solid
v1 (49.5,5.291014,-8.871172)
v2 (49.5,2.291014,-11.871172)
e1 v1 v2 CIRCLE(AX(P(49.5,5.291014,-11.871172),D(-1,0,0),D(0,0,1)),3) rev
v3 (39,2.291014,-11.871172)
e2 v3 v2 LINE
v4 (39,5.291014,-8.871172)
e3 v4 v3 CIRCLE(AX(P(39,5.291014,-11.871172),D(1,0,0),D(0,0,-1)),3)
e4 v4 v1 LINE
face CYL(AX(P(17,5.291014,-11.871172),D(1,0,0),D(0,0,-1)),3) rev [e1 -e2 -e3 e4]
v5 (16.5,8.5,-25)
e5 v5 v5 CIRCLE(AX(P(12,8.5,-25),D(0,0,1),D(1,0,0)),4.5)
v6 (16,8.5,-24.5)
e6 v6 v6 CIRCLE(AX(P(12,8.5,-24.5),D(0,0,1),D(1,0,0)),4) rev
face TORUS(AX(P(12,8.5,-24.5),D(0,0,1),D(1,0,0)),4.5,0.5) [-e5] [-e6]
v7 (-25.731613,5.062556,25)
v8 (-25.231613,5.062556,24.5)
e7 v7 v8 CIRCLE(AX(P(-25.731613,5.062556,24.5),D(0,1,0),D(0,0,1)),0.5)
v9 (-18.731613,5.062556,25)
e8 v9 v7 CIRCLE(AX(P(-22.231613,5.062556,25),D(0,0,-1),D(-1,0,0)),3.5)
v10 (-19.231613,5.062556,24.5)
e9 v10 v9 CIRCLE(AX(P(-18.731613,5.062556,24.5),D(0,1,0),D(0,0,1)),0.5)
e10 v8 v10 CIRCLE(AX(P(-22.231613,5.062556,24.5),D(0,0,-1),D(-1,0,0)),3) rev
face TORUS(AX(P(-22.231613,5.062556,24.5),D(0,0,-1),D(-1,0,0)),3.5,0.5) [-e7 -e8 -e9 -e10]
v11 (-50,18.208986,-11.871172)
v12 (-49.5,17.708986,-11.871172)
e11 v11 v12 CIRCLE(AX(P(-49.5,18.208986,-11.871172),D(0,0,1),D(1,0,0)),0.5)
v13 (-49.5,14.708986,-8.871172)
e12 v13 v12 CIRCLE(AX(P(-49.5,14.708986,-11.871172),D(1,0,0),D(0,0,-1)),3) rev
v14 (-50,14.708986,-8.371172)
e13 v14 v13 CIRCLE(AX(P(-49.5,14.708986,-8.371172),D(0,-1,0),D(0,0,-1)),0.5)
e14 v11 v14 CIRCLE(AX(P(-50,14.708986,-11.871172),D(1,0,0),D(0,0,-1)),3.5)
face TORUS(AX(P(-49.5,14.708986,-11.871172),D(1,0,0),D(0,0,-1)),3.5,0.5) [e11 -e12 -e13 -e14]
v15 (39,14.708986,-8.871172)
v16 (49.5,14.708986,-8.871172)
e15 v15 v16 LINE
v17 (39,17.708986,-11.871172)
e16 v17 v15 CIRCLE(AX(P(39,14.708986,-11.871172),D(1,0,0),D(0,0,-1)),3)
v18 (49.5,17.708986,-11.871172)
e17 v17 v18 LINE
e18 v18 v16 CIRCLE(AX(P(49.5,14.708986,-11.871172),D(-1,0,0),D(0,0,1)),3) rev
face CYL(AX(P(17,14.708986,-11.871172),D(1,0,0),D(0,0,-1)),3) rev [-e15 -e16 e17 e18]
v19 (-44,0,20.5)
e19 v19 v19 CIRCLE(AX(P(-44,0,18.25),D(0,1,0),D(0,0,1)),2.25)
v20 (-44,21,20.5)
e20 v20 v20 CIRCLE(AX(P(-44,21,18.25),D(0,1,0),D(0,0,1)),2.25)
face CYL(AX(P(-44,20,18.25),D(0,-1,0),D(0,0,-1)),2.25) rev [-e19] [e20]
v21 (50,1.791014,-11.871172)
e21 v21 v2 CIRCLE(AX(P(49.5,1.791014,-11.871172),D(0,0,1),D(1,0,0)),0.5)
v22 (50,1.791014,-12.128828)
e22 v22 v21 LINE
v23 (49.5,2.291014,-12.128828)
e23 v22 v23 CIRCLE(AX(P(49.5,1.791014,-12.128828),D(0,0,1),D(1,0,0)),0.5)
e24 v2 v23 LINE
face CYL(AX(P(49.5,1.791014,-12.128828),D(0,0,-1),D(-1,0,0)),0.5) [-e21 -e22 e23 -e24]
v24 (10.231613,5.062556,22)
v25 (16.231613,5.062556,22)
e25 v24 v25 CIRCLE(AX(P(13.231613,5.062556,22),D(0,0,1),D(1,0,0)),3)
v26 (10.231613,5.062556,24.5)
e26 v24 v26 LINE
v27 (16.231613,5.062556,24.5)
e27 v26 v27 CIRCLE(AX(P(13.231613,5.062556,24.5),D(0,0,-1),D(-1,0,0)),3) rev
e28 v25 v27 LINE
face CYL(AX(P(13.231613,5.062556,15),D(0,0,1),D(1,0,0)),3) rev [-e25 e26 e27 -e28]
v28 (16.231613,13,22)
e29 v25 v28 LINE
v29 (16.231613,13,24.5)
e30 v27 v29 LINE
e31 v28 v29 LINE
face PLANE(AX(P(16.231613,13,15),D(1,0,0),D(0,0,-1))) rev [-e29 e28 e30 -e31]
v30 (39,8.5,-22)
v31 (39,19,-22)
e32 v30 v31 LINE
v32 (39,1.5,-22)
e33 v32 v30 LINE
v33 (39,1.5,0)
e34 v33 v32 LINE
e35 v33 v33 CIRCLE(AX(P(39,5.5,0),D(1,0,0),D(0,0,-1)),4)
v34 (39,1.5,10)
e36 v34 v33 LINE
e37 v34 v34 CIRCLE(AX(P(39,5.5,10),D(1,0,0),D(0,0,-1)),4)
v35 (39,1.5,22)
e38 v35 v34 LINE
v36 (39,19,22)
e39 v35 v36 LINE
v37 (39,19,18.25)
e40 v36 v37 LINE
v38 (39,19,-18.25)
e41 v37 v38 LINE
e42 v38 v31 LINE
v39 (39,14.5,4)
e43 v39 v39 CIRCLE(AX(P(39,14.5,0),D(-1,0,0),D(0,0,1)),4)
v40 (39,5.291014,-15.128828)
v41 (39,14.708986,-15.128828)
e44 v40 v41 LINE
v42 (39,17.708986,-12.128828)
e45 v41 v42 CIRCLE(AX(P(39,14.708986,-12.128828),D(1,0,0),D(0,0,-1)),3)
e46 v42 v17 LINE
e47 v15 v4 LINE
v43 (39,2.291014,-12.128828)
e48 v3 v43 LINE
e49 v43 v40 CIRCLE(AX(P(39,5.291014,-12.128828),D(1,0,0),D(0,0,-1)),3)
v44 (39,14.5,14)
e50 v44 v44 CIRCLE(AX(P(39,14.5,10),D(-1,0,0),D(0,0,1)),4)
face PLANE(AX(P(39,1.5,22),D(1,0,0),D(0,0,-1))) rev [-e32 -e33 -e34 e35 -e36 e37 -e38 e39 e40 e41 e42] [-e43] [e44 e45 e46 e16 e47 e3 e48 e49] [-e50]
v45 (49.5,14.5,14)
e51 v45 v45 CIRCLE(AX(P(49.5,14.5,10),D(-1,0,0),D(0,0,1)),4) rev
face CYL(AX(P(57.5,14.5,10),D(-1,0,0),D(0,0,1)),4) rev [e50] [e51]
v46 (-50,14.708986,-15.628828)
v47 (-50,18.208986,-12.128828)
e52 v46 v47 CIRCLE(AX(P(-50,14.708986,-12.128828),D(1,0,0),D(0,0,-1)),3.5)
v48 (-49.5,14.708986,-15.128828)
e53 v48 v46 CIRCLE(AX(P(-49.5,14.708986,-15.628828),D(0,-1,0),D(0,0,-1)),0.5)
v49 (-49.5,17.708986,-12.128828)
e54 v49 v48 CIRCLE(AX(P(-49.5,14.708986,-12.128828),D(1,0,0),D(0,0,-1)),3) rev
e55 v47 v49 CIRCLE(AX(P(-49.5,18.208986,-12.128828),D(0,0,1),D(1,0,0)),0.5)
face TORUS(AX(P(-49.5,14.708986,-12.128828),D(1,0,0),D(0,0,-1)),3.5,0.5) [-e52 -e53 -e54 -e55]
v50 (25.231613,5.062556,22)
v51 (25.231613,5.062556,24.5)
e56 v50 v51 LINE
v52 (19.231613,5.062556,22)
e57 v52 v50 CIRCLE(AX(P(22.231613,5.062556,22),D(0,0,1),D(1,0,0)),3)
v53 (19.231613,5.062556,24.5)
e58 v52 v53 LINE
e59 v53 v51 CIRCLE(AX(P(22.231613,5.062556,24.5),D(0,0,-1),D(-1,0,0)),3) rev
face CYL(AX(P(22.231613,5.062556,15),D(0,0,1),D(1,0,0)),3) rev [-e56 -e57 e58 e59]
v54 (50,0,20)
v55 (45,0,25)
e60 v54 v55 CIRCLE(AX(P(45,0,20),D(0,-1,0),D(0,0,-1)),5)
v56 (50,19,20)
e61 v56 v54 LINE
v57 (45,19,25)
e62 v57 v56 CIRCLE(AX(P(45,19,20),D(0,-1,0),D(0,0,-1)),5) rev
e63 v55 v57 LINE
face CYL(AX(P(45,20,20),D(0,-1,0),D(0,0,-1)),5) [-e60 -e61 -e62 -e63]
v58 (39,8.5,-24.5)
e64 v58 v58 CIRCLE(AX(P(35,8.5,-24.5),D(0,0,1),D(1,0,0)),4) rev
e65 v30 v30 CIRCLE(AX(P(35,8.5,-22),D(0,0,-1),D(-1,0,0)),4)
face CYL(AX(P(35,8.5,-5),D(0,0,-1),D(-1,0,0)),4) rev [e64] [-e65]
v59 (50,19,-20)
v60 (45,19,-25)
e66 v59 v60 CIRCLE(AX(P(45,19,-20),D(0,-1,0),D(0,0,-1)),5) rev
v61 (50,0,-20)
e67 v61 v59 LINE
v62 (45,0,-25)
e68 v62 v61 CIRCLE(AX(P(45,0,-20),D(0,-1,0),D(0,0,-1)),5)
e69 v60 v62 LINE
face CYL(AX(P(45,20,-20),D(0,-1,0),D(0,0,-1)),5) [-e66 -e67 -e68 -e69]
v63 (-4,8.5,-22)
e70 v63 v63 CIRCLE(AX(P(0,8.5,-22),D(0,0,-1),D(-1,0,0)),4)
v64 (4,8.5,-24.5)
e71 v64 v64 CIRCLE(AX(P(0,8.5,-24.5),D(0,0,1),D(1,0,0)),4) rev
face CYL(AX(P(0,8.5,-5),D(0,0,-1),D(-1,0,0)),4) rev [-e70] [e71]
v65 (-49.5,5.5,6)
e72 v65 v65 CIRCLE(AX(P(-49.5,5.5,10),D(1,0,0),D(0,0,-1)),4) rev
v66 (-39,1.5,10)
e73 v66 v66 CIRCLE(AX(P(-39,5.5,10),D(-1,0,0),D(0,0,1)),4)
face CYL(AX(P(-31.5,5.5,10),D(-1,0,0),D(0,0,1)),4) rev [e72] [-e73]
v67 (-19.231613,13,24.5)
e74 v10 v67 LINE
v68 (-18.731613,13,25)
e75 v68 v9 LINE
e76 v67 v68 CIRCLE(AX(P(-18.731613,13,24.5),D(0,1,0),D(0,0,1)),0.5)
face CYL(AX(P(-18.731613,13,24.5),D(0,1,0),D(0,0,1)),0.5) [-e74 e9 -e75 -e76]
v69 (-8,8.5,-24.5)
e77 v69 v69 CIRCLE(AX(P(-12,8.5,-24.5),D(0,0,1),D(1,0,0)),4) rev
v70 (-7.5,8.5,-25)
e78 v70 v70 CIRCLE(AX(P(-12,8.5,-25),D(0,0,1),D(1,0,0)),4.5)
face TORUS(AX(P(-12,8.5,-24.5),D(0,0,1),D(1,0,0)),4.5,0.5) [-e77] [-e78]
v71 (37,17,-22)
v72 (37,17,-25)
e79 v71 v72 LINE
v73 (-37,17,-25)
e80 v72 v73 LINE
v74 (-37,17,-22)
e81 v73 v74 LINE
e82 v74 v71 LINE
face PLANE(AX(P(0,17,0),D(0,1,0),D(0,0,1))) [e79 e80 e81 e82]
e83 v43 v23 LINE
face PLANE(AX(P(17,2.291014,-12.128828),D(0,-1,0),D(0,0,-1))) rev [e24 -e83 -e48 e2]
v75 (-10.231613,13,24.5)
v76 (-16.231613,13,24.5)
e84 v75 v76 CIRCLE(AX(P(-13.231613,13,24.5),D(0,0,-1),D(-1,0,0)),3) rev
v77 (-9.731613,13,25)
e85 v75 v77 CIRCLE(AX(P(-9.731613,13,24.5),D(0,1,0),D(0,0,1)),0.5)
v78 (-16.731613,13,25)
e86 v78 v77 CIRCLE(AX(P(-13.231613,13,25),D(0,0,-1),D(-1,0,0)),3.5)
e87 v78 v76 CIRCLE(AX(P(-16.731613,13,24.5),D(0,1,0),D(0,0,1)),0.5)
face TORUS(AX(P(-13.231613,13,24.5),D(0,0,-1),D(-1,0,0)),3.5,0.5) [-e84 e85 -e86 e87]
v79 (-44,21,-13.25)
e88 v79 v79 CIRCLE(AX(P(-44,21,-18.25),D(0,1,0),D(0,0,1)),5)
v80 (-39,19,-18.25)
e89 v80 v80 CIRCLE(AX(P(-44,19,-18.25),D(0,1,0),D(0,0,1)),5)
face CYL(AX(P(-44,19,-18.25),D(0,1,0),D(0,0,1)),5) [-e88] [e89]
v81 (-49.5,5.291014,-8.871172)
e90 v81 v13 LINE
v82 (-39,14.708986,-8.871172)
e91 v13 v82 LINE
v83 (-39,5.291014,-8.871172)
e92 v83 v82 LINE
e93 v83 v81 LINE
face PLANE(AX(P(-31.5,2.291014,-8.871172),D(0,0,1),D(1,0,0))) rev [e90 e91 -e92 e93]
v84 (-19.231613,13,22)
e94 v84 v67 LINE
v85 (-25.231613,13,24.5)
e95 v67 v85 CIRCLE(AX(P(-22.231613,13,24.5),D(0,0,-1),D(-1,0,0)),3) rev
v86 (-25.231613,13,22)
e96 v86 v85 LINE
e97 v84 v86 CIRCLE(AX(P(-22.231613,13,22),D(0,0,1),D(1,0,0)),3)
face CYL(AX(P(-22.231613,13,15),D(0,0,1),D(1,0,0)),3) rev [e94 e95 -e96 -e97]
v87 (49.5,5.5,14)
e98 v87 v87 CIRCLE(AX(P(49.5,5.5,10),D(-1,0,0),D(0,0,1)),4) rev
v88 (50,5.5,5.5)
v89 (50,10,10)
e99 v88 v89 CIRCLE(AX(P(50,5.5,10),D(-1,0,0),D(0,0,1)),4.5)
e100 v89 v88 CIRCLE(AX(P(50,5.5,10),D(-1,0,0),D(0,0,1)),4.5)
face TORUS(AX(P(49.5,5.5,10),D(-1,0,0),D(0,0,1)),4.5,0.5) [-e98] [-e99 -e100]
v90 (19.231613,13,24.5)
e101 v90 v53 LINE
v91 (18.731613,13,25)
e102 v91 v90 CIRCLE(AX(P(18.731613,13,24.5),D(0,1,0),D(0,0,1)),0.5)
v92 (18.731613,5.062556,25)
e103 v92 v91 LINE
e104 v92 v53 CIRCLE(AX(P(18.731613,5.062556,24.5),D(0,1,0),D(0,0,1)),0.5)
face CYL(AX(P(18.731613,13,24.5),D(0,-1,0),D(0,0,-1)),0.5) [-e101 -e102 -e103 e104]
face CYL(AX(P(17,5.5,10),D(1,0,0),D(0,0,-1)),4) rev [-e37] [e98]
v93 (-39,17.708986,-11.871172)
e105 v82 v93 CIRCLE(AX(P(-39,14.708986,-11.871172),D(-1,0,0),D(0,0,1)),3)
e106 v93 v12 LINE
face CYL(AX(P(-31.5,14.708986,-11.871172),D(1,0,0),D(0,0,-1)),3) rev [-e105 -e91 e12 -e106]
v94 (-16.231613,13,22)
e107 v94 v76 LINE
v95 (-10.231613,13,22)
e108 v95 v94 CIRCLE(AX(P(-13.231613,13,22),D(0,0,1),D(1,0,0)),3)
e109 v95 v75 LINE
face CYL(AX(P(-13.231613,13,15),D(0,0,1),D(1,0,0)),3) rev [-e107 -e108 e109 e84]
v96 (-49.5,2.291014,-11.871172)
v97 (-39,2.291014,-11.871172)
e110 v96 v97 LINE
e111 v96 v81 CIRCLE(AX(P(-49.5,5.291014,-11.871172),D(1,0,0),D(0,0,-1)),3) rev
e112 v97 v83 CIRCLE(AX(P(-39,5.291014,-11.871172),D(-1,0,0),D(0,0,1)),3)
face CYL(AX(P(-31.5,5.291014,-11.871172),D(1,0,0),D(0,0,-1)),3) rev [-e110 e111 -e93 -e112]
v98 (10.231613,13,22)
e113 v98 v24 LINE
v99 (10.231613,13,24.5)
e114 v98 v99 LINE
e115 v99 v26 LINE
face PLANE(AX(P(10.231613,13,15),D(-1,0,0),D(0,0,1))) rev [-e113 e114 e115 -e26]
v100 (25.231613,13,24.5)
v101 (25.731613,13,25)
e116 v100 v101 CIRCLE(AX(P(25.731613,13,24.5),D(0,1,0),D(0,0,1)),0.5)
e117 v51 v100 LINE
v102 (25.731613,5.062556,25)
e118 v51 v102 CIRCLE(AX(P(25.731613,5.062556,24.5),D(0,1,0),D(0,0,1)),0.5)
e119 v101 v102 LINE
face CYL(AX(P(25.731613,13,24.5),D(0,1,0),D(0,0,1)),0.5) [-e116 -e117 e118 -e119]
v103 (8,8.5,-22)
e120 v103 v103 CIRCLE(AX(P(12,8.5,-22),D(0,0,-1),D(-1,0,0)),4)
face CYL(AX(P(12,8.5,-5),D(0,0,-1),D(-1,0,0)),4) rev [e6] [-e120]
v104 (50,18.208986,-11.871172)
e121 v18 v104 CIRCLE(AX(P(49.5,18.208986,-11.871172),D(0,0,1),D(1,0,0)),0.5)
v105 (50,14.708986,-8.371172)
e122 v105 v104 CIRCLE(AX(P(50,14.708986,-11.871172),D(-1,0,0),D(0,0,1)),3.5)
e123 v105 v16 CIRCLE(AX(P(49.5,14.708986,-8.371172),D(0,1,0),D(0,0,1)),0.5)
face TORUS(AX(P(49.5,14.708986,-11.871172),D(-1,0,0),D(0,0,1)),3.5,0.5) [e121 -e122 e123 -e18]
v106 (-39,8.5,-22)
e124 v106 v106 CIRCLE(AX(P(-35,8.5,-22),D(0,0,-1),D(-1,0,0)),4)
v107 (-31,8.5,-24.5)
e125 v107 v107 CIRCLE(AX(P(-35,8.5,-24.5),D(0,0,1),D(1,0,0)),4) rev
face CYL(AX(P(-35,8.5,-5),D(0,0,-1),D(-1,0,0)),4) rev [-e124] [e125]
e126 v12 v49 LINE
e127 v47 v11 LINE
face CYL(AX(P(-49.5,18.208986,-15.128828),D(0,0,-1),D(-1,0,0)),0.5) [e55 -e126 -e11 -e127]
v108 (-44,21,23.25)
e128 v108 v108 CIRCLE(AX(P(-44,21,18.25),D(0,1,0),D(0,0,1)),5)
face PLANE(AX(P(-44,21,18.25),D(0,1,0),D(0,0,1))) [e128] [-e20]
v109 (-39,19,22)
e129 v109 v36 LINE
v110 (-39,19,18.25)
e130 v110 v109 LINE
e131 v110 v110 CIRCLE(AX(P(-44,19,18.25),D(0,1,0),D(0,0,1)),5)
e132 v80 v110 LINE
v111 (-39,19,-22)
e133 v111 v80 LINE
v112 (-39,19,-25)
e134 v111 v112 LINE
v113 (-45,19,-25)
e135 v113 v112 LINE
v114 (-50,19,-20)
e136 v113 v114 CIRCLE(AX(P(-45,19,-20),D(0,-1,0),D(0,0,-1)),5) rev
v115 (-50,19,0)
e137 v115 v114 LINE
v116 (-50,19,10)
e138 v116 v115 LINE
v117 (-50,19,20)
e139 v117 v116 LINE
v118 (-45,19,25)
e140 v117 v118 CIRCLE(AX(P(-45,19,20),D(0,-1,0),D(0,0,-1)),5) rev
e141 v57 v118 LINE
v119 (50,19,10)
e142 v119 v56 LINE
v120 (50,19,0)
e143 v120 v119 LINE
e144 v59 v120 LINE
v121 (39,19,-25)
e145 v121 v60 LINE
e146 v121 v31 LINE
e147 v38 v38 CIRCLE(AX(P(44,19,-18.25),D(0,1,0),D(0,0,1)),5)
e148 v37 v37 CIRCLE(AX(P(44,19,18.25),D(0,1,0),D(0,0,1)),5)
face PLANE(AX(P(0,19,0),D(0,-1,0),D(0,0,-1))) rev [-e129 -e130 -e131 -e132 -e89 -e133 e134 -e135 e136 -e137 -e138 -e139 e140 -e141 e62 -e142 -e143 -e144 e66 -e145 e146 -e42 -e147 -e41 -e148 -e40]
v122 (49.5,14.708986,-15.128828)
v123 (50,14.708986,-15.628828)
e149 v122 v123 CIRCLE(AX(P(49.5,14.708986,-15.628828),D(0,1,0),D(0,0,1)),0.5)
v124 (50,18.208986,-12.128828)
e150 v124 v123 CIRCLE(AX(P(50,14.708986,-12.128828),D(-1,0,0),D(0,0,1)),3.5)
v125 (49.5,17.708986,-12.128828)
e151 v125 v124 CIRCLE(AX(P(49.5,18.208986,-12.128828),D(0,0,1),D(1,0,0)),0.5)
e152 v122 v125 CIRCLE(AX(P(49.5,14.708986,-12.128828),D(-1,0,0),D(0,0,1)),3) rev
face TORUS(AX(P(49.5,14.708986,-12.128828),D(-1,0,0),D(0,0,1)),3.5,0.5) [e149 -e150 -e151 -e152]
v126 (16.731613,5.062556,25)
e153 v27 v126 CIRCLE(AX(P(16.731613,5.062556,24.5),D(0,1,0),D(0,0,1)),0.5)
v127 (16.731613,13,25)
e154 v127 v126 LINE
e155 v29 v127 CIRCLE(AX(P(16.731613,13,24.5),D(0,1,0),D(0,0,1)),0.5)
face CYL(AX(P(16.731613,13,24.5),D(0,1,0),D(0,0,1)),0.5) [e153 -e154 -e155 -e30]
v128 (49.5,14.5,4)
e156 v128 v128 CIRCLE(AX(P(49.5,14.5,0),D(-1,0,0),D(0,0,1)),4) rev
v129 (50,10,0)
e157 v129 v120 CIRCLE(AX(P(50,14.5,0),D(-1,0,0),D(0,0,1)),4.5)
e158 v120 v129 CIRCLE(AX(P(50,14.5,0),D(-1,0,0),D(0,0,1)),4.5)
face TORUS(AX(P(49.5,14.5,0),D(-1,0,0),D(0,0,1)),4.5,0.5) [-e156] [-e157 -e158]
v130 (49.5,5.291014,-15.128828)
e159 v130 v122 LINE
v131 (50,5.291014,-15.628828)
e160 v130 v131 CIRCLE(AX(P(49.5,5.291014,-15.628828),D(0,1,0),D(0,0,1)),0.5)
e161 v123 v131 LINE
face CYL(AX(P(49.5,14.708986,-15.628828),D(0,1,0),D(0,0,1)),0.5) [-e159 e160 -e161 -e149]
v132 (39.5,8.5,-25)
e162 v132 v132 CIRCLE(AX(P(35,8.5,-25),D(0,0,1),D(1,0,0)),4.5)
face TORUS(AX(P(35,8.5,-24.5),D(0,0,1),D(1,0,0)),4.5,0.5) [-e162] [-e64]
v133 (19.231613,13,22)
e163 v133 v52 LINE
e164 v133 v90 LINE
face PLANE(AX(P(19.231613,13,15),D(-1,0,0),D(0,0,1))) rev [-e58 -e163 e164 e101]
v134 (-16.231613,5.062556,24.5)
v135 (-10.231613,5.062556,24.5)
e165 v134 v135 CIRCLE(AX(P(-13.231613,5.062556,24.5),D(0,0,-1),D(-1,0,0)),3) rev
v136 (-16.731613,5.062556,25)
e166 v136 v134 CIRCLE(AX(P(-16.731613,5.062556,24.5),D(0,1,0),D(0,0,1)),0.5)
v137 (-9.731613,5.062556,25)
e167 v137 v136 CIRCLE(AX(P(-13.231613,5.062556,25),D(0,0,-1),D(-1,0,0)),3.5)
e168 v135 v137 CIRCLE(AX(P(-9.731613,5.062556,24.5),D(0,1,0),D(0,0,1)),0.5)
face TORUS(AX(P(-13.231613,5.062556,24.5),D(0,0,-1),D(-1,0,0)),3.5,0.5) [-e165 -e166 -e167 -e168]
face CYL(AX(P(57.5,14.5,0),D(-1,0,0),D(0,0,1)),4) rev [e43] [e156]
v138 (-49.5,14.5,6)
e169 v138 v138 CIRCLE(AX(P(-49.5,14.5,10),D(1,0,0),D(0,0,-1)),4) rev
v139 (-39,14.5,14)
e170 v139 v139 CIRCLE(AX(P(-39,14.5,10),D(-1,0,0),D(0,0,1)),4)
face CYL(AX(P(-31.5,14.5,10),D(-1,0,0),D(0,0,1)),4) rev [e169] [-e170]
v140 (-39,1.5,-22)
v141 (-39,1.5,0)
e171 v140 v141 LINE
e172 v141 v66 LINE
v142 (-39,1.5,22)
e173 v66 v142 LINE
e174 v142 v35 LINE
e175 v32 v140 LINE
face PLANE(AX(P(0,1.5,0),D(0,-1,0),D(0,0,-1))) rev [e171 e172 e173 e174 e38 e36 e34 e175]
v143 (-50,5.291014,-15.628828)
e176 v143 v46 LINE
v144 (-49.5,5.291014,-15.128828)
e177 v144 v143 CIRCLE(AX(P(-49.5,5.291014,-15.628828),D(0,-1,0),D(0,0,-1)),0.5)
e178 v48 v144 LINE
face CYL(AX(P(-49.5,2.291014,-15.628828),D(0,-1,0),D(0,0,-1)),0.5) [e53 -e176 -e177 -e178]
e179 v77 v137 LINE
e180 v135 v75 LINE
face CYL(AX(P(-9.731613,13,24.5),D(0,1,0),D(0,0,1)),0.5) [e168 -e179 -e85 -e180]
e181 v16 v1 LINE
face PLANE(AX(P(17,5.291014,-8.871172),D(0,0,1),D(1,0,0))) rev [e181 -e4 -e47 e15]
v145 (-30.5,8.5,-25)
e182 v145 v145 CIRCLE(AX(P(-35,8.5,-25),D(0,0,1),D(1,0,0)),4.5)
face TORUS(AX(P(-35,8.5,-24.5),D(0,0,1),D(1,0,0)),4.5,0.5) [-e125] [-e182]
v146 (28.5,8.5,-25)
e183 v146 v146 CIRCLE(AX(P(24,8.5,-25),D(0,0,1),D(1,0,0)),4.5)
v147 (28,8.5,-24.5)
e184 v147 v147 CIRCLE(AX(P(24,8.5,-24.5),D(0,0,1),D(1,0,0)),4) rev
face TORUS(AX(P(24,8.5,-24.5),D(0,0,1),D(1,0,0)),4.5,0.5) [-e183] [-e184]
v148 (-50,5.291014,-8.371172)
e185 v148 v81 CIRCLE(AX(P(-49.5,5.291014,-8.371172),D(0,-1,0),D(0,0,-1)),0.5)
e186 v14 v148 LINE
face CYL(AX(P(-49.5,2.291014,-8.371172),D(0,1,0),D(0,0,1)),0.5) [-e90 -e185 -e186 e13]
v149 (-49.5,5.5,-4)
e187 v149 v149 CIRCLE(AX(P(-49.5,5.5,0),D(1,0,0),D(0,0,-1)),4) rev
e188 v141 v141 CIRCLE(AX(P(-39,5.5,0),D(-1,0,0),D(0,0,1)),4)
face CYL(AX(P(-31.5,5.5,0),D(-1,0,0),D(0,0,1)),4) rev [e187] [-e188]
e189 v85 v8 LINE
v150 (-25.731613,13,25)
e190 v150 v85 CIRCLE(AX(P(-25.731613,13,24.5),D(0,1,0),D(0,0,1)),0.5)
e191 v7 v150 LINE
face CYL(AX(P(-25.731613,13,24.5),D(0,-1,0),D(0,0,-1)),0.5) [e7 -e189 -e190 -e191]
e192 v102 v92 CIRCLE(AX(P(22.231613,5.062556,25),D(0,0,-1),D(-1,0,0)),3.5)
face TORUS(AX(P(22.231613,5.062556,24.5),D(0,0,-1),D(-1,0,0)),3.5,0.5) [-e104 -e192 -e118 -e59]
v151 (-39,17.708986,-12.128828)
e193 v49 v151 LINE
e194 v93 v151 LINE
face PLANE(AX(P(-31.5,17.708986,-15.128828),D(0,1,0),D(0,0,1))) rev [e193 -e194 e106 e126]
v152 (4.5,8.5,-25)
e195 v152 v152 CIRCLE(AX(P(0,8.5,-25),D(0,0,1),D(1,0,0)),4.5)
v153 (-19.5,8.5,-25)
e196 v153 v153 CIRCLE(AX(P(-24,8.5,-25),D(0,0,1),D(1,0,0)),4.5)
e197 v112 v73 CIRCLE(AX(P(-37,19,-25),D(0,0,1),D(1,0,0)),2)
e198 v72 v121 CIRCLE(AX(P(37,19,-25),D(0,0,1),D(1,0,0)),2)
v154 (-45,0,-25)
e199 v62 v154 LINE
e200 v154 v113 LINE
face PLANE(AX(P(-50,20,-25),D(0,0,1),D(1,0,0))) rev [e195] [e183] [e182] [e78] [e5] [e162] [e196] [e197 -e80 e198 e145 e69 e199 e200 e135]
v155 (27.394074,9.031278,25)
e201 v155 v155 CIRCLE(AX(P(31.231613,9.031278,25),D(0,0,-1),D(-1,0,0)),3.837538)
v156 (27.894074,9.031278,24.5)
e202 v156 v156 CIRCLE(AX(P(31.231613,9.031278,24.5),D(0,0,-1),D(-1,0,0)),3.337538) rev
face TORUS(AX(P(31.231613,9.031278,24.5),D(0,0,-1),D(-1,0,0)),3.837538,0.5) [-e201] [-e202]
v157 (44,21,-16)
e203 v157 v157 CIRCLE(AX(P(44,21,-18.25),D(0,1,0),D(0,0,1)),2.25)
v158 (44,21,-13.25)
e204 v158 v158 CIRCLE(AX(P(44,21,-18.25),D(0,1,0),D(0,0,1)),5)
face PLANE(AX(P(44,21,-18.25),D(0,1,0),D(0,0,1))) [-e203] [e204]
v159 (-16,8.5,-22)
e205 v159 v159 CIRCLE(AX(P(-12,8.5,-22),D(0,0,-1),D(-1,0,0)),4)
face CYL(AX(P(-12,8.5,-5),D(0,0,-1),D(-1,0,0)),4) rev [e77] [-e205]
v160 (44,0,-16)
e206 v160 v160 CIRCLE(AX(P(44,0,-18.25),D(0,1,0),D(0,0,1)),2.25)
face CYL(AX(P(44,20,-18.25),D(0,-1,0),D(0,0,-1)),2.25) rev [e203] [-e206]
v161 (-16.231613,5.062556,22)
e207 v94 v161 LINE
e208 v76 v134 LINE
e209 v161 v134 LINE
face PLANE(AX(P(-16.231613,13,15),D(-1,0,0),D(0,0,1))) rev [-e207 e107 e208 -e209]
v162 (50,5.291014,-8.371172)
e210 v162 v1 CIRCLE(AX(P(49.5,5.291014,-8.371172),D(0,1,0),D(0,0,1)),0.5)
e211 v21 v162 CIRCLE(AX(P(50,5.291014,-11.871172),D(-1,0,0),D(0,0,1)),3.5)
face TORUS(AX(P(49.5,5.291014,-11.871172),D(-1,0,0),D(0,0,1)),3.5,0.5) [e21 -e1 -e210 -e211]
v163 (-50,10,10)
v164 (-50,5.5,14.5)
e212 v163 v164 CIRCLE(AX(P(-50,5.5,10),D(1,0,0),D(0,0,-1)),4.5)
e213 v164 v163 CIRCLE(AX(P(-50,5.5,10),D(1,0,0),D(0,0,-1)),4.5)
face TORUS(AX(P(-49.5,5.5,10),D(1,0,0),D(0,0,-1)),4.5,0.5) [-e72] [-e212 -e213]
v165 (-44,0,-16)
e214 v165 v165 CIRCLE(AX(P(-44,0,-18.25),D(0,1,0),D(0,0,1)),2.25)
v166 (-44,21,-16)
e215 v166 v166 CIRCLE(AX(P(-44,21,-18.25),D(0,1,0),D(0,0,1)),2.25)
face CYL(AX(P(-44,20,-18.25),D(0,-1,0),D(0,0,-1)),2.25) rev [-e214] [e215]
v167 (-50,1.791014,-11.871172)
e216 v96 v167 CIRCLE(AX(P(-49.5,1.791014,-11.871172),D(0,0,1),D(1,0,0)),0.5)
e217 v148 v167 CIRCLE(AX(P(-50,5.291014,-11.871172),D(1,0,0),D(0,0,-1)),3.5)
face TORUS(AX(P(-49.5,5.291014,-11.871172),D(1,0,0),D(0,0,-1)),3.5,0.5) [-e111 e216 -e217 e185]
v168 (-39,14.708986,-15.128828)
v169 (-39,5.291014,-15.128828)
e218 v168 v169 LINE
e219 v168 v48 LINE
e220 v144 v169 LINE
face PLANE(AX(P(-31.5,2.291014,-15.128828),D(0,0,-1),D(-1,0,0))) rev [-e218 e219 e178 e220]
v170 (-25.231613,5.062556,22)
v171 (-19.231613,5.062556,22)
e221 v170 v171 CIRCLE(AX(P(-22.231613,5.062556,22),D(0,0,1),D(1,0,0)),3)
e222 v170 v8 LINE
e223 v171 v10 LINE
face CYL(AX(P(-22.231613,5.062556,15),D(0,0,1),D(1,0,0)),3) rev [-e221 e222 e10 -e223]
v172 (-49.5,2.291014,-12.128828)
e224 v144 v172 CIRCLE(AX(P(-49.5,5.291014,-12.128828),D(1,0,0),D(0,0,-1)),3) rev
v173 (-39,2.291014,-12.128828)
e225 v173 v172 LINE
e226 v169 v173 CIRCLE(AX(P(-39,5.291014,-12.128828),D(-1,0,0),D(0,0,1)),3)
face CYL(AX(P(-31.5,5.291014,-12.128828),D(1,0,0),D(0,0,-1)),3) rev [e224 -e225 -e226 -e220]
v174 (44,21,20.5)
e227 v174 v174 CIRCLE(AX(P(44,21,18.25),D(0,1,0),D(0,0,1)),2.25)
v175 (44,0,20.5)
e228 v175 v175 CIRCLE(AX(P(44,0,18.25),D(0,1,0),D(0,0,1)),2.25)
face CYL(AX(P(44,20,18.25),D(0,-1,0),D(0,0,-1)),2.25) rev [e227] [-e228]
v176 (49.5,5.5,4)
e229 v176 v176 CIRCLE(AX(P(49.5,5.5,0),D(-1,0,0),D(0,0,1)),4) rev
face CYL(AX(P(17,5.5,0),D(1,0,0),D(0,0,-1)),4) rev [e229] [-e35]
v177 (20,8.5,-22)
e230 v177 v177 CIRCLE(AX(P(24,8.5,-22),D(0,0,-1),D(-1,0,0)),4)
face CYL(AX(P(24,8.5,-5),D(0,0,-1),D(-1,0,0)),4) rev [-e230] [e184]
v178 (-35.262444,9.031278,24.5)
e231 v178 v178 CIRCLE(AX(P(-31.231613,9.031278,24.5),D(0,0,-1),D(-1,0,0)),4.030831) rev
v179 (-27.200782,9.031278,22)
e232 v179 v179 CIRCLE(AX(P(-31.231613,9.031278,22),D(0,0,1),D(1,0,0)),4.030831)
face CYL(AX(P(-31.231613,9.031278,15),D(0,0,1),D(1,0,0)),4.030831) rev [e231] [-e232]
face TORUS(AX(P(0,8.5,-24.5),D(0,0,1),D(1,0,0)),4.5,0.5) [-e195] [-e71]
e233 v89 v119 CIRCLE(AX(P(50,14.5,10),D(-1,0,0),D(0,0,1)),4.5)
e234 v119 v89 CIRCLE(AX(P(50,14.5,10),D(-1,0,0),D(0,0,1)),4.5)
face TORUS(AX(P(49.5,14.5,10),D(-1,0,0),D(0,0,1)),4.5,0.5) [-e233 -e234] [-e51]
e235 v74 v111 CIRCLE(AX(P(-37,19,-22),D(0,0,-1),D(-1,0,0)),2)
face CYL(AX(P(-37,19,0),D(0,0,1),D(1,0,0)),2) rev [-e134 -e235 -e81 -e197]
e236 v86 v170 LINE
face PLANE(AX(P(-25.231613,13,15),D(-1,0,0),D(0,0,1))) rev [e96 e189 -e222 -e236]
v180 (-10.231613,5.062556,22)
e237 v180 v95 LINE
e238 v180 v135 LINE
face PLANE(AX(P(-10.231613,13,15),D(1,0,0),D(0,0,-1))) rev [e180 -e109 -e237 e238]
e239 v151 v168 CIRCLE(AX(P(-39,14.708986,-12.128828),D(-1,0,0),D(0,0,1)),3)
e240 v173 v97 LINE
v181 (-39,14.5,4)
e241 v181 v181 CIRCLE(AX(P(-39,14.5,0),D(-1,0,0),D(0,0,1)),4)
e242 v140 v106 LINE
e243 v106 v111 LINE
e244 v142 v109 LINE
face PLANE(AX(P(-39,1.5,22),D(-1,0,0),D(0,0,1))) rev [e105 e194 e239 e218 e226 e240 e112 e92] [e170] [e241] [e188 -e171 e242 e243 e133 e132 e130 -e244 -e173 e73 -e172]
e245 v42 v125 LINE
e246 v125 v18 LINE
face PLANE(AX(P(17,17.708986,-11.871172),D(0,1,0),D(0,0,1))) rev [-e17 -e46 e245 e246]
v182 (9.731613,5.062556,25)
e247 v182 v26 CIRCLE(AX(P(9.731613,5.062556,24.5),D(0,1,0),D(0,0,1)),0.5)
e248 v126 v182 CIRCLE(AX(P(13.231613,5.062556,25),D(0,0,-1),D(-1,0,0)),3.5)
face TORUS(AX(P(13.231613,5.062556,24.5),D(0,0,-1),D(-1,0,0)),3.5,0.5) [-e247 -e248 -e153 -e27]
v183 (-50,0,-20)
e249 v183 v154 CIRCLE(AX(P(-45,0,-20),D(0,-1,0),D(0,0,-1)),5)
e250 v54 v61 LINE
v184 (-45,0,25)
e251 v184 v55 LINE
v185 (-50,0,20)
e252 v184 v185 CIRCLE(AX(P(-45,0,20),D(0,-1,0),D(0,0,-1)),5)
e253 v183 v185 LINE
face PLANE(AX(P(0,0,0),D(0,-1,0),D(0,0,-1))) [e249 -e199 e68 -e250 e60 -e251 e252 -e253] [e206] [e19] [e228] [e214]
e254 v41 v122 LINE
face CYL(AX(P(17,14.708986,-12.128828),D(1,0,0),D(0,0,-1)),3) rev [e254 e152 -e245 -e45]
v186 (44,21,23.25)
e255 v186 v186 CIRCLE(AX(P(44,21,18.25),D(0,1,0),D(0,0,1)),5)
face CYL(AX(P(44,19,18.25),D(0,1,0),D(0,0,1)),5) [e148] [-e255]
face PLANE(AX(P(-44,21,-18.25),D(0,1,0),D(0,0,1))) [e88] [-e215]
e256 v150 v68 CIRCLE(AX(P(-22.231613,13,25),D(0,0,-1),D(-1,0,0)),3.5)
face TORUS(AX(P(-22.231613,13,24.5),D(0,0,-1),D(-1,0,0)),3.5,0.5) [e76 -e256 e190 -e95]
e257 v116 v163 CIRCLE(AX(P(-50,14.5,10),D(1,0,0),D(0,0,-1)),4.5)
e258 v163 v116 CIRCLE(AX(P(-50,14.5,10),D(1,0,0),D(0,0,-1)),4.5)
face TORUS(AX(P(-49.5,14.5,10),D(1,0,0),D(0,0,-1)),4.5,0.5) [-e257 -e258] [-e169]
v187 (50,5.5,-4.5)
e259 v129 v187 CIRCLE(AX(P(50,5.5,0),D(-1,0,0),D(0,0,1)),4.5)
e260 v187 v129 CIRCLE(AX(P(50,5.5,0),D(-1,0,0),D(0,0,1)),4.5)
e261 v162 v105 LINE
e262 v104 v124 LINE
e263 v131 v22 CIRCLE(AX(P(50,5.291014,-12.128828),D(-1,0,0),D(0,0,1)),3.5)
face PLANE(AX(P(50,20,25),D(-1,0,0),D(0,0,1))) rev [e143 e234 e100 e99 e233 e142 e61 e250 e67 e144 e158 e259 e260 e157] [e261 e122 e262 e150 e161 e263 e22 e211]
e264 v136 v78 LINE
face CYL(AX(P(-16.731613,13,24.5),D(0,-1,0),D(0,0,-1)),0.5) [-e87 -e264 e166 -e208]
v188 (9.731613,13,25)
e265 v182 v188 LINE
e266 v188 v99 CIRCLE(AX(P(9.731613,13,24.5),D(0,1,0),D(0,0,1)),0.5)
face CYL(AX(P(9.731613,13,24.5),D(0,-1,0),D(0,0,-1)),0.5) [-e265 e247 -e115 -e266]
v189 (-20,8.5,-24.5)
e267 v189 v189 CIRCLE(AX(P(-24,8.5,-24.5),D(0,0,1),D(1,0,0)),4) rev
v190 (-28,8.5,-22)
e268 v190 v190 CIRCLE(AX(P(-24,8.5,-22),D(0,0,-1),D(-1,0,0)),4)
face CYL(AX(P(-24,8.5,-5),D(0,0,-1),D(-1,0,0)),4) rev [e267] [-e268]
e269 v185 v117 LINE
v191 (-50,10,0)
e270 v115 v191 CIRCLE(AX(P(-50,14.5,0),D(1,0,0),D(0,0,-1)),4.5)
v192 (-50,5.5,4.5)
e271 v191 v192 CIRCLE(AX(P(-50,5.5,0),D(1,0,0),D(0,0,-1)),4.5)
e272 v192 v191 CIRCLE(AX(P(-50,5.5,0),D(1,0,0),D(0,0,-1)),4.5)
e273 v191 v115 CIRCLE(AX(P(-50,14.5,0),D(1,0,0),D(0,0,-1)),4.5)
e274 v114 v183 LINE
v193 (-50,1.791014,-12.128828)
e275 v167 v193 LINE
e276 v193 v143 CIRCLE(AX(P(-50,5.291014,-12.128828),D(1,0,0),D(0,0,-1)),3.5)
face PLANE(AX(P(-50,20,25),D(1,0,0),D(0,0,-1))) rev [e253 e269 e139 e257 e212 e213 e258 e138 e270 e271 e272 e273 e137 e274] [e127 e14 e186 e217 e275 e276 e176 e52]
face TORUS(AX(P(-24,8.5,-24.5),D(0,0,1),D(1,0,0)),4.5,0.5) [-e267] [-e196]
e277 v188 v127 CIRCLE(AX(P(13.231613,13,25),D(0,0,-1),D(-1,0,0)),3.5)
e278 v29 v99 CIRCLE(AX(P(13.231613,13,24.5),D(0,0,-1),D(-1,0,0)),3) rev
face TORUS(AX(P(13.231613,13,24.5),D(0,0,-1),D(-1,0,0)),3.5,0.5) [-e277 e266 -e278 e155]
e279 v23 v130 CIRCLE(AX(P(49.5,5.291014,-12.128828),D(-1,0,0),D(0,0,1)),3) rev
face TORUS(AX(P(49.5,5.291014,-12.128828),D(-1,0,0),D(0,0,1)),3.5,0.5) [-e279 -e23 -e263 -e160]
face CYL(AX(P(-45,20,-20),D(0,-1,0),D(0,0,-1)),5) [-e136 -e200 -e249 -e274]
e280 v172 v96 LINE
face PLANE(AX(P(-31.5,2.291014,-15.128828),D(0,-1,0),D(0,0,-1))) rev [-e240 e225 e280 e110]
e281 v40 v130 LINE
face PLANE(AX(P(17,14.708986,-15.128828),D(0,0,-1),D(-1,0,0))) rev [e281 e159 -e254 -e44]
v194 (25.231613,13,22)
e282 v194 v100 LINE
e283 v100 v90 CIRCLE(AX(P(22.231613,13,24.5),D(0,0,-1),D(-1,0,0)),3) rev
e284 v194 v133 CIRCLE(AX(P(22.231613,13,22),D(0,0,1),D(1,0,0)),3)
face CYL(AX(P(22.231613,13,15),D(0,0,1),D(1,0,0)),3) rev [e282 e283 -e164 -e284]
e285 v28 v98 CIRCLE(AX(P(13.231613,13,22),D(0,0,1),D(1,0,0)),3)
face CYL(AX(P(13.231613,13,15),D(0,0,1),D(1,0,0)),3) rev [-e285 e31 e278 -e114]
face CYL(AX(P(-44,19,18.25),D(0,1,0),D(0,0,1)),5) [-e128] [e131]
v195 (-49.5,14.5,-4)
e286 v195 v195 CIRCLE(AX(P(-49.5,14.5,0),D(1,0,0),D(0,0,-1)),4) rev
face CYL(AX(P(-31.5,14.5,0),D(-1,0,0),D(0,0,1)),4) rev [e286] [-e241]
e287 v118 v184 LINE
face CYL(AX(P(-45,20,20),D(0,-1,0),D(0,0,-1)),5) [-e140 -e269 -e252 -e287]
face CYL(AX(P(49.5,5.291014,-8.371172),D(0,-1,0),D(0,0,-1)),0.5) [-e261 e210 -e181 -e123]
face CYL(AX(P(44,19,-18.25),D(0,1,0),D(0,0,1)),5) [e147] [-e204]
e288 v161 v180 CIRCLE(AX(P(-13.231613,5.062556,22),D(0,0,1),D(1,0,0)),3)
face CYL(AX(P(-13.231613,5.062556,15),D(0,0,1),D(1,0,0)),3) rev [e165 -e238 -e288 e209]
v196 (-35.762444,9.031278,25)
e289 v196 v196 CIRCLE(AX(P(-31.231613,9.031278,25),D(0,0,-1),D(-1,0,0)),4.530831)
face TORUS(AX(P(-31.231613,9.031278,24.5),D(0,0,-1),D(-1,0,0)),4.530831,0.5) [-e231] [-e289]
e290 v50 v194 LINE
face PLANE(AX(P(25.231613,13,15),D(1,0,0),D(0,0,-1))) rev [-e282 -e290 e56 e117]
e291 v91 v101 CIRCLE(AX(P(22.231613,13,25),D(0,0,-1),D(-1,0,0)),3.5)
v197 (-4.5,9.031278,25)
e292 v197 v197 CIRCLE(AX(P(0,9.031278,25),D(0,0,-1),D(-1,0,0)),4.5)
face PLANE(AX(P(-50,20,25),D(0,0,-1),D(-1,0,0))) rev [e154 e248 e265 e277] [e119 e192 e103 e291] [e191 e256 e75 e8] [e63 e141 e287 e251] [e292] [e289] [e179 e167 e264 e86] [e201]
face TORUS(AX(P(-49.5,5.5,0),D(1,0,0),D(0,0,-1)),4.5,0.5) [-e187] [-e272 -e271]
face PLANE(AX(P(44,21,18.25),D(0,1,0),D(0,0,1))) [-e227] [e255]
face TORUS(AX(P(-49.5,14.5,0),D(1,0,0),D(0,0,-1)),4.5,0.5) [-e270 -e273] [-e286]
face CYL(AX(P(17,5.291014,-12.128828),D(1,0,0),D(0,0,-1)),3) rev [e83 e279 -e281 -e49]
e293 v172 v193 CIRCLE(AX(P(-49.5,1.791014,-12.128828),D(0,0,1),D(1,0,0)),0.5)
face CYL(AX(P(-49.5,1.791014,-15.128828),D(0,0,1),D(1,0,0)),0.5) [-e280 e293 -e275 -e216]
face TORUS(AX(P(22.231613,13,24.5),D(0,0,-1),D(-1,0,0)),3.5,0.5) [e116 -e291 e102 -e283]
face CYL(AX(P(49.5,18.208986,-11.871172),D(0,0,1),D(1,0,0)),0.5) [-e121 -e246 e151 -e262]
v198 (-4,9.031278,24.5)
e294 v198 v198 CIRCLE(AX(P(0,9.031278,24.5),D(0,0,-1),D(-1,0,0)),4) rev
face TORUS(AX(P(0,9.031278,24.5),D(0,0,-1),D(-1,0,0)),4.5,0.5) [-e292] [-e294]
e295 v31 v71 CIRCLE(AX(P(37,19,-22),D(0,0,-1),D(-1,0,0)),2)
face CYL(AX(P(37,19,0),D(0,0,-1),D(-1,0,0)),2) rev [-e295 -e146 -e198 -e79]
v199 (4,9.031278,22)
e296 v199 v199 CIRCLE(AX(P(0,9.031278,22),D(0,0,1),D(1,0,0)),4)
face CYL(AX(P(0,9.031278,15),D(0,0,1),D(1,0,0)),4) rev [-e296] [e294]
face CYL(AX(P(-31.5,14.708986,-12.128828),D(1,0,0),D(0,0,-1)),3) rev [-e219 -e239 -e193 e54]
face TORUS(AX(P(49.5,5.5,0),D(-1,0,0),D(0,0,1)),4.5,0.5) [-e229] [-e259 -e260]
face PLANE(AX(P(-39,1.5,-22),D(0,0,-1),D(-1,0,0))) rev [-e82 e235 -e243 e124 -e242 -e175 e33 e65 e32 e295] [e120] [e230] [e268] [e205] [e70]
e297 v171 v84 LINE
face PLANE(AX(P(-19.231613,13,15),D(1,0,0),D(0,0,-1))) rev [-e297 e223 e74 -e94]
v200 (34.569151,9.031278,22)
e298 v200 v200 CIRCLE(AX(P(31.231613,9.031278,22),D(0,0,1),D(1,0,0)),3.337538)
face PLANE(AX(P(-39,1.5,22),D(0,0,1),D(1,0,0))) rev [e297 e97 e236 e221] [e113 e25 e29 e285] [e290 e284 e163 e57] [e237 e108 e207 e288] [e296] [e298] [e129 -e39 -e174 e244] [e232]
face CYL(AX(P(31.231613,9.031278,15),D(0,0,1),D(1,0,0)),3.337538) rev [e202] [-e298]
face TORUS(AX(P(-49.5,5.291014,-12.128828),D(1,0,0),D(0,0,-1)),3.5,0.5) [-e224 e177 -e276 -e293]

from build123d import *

# Parameters (mm, degrees)
CROQUIS1_W              = 100
CROQUIS1_H              = 50
CROQUIS1_R              = 2.25
SALIENTE_EXTRUIR2_DEPTH = 20
CROQUIS3_W              = 78
CROQUIS3_H              = 44
CORTAR_EXTRUIR1_DEPTH   = 18.5
CROQUIS4_R              = 4
CROQUIS4_W              = 6.257655616
CROQUIS4_H              = 15.417971864
CORTAR_EXTRUIR2_DEPTH   = 18.5
CROQUIS5_R              = 4
CORTAR_EXTRUIR3_DEPTH   = 18.5
REDONDEO1_R             = 5
CROQUIS8_W              = 78
CROQUIS8_H              = 3
CORTAR_EXTRUIR4_DEPTH   = 3
REDONDEO2_R             = 2
CROQUIS9_W              = 114.475750888
CROQUIS9_H              = 62.589988472
CROQUIS9_R              = 5
CORTAR_EXTRUIR6_DEPTH   = 1
REDONDEO3_R             = 3
CROQUIS12_R             = 5
CROQUIS12_R_2           = 2.25
SALIENTE_EXTRUIR4_DEPTH = 1
CROQUIS13_R             = 4
CROQUIS13_R_2           = 3.337538413
CROQUIS13_R_3           = 4.030830943
CORTAR_EXTRUIR8_DEPTH   = 10
CROQUIS14_R             = 4
CORTAR_EXTRUIR9_DEPTH   = 33
CROQUIS16_R             = 4
CORTAR_EXTRUIR10_DEPTH  = 20
REDONDEO6_R             = 0.5


with BuildPart() as part:
    # Croquis1 → Saliente-Extruir2 (new body)
    with BuildSketch(Plane(origin=(0, 0, 0), x_dir=(1, 0, 0), z_dir=(0, 1, 0))):
        Rectangle(CROQUIS1_W, CROQUIS1_H)
        with Locations(Location((-44, 18.25, 0), (0, 0, 270))):
            Circle(CROQUIS1_R, mode=Mode.SUBTRACT)
        with Locations(Location((44, 18.25, 0), (0, 0, 270))):
            Circle(CROQUIS1_R, mode=Mode.SUBTRACT)
        with Locations(Location((44, -18.25, 0), (0, 0, 270))):
            Circle(CROQUIS1_R, mode=Mode.SUBTRACT)
        with Locations(Location((-44, -18.25, 0), (0, 0, 270))):
            Circle(CROQUIS1_R, mode=Mode.SUBTRACT)
    extrude(amount=SALIENTE_EXTRUIR2_DEPTH)

    # Croquis3 → Cortar-Extruir1 (cut)
    with BuildSketch(Plane(origin=(0, 20, 0), x_dir=(1, 0, 0), z_dir=(0, 1, 0))):
        Rectangle(CROQUIS3_W, CROQUIS3_H)
    extrude(amount=-CORTAR_EXTRUIR1_DEPTH, mode=Mode.SUBTRACT)

    # Croquis4 → Cortar-Extruir2 (cut)
    with BuildSketch(Plane.ZY.offset(50)):
        with Locations((0, 14.5)):
            Circle(CROQUIS4_R)
        with Locations((10, 14.5)):
            Circle(CROQUIS4_R)
        with Locations((10, 5.5)):
            Circle(CROQUIS4_R)
        with Locations((0, 5.5)):
            Circle(CROQUIS4_R)
        with Locations((-12, 10)):
            Rectangle(CROQUIS4_W, CROQUIS4_H)
    extrude(amount=-CORTAR_EXTRUIR2_DEPTH, mode=Mode.SUBTRACT)

    # Croquis5 → Cortar-Extruir3 (cut)
    with BuildSketch(Plane.ZY.offset(-39)):
        with Locations((10, 14.5)):
            Circle(CROQUIS5_R)
        with Locations((0, 14.5)):
            Circle(CROQUIS5_R)
    extrude(amount=-CORTAR_EXTRUIR3_DEPTH, mode=Mode.SUBTRACT)

    # Redondeo1
    redondeo1_edges = [part.edges().sort_by_distance(p)[0] for p in [
        (50, 10, 25),
        (-50, 10, 25),
        (-50, 10, -25),
        (50, 10, -25),
    ]]
    fillet(redondeo1_edges, radius=REDONDEO1_R)

    # Croquis8 → Cortar-Extruir4 (cut)
    with BuildSketch(Plane(origin=(0, 20, 0), x_dir=(1, 0, 0), z_dir=(0, 1, 0))):
        with Locations((0, 23.5)):
            Rectangle(CROQUIS8_W, CROQUIS8_H)
    extrude(amount=-CORTAR_EXTRUIR4_DEPTH, mode=Mode.SUBTRACT)

    # Redondeo2
    redondeo2_edges = [part.edges().sort_by_distance(p)[0] for p in [
        (-39, 17, -23.5),
        (39, 17, -23.5),
    ]]
    fillet(redondeo2_edges, radius=REDONDEO2_R)

    # Croquis9 → Cortar-Extruir6 (cut)
    with BuildSketch(Plane(origin=(0, 20, 0), x_dir=(1, 0, 0), z_dir=(0, 1, 0))):
        Rectangle(CROQUIS9_W, CROQUIS9_H)
        with Locations(Location((44, -18.25, 0), (0, 0, 270))):
            Circle(CROQUIS9_R, mode=Mode.SUBTRACT)
        with Locations(Location((44, 18.25, 0), (0, 0, 270))):
            Circle(CROQUIS9_R, mode=Mode.SUBTRACT)
        with Locations(Location((-44, 18.25, 0), (0, 0, 270))):
            Circle(CROQUIS9_R, mode=Mode.SUBTRACT)
        with Locations(Location((-44, -18.25, 0), (0, 0, 270))):
            Circle(CROQUIS9_R, mode=Mode.SUBTRACT)
    extrude(amount=-CORTAR_EXTRUIR6_DEPTH, mode=Mode.SUBTRACT)

    # Redondeo3
    redondeo3_edges = [part.edges().sort_by_distance(p)[0] for p in [
        (-44.5, 17.708985932, -8.871172192),
        (-44.5, 2.291014068, -8.871172192),
        (-44.5, 2.291014068, -15.128827808),
        (-44.5, 17.708985932, -15.128827808),
    ]]
    fillet(redondeo3_edges, radius=REDONDEO3_R)

    # Croquis12 → Saliente-Extruir4 (add)
    # profile 1 of 4: a face of its own
    with BuildSketch(Plane(origin=(0, 20, 0), x_dir=(1, 0, 0), z_dir=(0, 1, 0))):
        with Locations(Location((44, -18.25, 0), (0, 0, 270))):
            Circle(CROQUIS12_R)
        with Locations(Location((44, -18.25, 0), (0, 0, 270))):
            Circle(CROQUIS12_R_2, mode=Mode.SUBTRACT)
    # profile 2 of 4: a face of its own
    with BuildSketch(Plane(origin=(0, 20, 0), x_dir=(1, 0, 0), z_dir=(0, 1, 0))):
        with Locations(Location((44, 18.25, 0), (0, 0, 270))):
            Circle(CROQUIS12_R)
        with Locations(Location((44, 18.25, 0), (0, 0, 270))):
            Circle(CROQUIS12_R_2, mode=Mode.SUBTRACT)
    # profile 3 of 4: a face of its own
    with BuildSketch(Plane(origin=(0, 20, 0), x_dir=(1, 0, 0), z_dir=(0, 1, 0))):
        with Locations(Location((-44, -18.25, 0), (0, 0, 270))):
            Circle(CROQUIS12_R)
        with Locations(Location((-44, -18.25, 0), (0, 0, 270))):
            Circle(CROQUIS12_R_2, mode=Mode.SUBTRACT)
    # profile 4 of 4: a face of its own
    with BuildSketch(Plane(origin=(0, 20, 0), x_dir=(1, 0, 0), z_dir=(0, 1, 0))):
        with Locations(Location((-44, 18.25, 0), (0, 0, 270))):
            Circle(CROQUIS12_R)
        with Locations(Location((-44, 18.25, 0), (0, 0, 270))):
            Circle(CROQUIS12_R_2, mode=Mode.SUBTRACT)
    extrude(amount=SALIENTE_EXTRUIR4_DEPTH)

    # Croquis13 → Cortar-Extruir8 (cut)
    with BuildSketch(Plane.XY.offset(25)):
        with Locations((0, 9.031278103)):
            Circle(CROQUIS13_R)
        with Locations((31.231612765, 9.031278103)):
            Circle(CROQUIS13_R_2)
        with Locations((-31.231612765, 9.031278103)):
            Circle(CROQUIS13_R_3)
        with BuildLine():
            Line((16.231612765, 13), (16.231612765, 5.062556207))
            ThreePointArc((16.231612765, 5.062556207), (13.231612765, 2.062556207), (10.231612765, 5.062556207))
            Line((10.231612765, 5.062556207), (10.231612765, 13))
            ThreePointArc((10.231612765, 13), (13.231612765, 16), (16.231612765, 13))
        make_face()
        with BuildLine():
            Line((-10.231612765, 13), (-10.231612765, 5.062556207))
            ThreePointArc((-10.231612765, 5.062556207), (-13.231612765, 2.062556207), (-16.231612765, 5.062556207))
            Line((-16.231612765, 5.062556207), (-16.231612765, 13))
            ThreePointArc((-16.231612765, 13), (-13.231612765, 16), (-10.231612765, 13))
        make_face()
        with BuildLine():
            Line((25.231612765, 13), (25.231612765, 5.062556207))
            ThreePointArc((25.231612765, 5.062556207), (22.231612765, 2.062556207), (19.231612765, 5.062556207))
            Line((19.231612765, 5.062556207), (19.231612765, 13))
            ThreePointArc((19.231612765, 13), (22.231612765, 16), (25.231612765, 13))
        make_face()
        with BuildLine():
            Line((-19.231612765, 13), (-19.231612765, 5.062556207))
            ThreePointArc((-19.231612765, 5.062556207), (-22.231612765, 2.062556207), (-25.231612765, 5.062556207))
            Line((-25.231612765, 5.062556207), (-25.231612765, 13))
            ThreePointArc((-25.231612765, 13), (-22.231612765, 16), (-19.231612765, 13))
        make_face()
    extrude(amount=-CORTAR_EXTRUIR8_DEPTH, mode=Mode.SUBTRACT)

    # Croquis14 → Cortar-Extruir9 (cut)
    with BuildSketch(Plane(origin=(50, 0, 0), x_dir=(0, 0, -1), z_dir=(1, 0, 0))):
        with Locations(Location((0, 5.5, 0), (0, 0, 180))):
            Circle(CROQUIS14_R)
        with Locations(Location((-10, 5.5, 0), (0, 0, 180))):
            Circle(CROQUIS14_R)
        with BuildLine():
            Line((12.128827808, 2.291014068), (11.871172192, 2.291014068))
            ThreePointArc((11.871172192, 2.291014068), (9.749851848, 3.169693724), (8.871172192, 5.291014068))
            Line((8.871172192, 5.291014068), (8.871172192, 14.708985932))
            ThreePointArc((8.871172192, 14.708985932), (9.749851848, 16.830306276), (11.871172192, 17.708985932))
            Line((11.871172192, 17.708985932), (12.128827808, 17.708985932))
            ThreePointArc((12.128827808, 17.708985932), (14.250148152, 16.830306276), (15.128827808, 14.708985932))
            Line((15.128827808, 14.708985932), (15.128827808, 5.291014068))
            ThreePointArc((15.128827808, 5.291014068), (14.250148152, 3.169693724), (12.128827808, 2.291014068))
        make_face()
    extrude(amount=-CORTAR_EXTRUIR9_DEPTH, mode=Mode.SUBTRACT)

    # Croquis16 → Cortar-Extruir10 (cut)
    with BuildSketch(Plane(origin=(0, 0, -25), x_dir=(-1, 0, 0), z_dir=(0, 0, -1))):
        with Locations((0, 8.5)):
            Circle(CROQUIS16_R)
        with Locations((12, 8.5)):
            Circle(CROQUIS16_R)
        with Locations((24, 8.5)):
            Circle(CROQUIS16_R)
        with Locations((-12, 8.5)):
            Circle(CROQUIS16_R)
        with Locations((-24, 8.5)):
            Circle(CROQUIS16_R)
        with Locations((-35, 8.5)):
            Circle(CROQUIS16_R)
        with Locations((35, 8.5)):
            Circle(CROQUIS16_R)
    extrude(amount=-CORTAR_EXTRUIR10_DEPTH, mode=Mode.SUBTRACT)

    # Redondeo6
    redondeo6_edges = [part.edges().sort_by_distance(p)[0] for p in [
        (-50, 10, -8.871172192),
        (-50, 2.291014068, -12),
        (-50, 10, -15.128827808),
        (-50, 17.708985932, -12),
        (-50, 3.169693724, -9.749851848),
        (-50, 3.169693724, -14.250148152),
        (-50, 16.830306276, -9.749851848),
        (-50, 16.830306276, -14.250148152),
        (-4, 9.031278103, 25),
        (-22.231612765, 16, 25),
        (-25.231612765, 9.031278103, 25),
        (-22.231612765, 2.062556207, 25),
        (-19.231612765, 9.031278103, 25),
        (22.231612765, 2.062556207, 25),
        (25.231612765, 9.031278103, 25),
        (22.231612765, 16, 25),
        (19.231612765, 9.031278103, 25),
        (-13.231612765, 2.062556207, 25),
        (-10.231612765, 9.031278103, 25),
        (-13.231612765, 16, 25),
        (-16.231612765, 9.031278103, 25),
        (27.894074352, 9.031278103, 25),
        (-35.262443708, 9.031278103, 25),
        (13.231612765, 16, 25),
        (10.231612765, 9.031278103, 25),
        (13.231612765, 2.062556207, 25),
        (16.231612765, 9.031278103, 25),
        (50, 3.169693724, -14.250148152),
        (50, 10, -15.128827808),
        (50, 16.830306276, -14.250148152),
        (50, 17.708985932, -12),
        (50, 16.830306276, -9.749851848),
        (50, 10, -8.871172192),
        (50, 3.169693724, -9.749851848),
        (50, 2.291014068, -12),
        (50, 5.5, -4),
        (50, 5.5, 6),
        (16, 8.5, -25),
        (4, 8.5, -25),
        (-8, 8.5, -25),
        (-20, 8.5, -25),
        (39, 8.5, -25),
        (-31, 8.5, -25),
        (28, 8.5, -25),
        (-50, 5.5, -4),
        (-50, 5.5, 6),
        (-50, 14.5, 6),
        (-50, 14.5, -4),
        (50, 14.5, 6),
        (50, 14.5, -4),
    ]]
    fillet(redondeo6_edges, radius=REDONDEO6_R - 0.0001)  # a hair under: the kernel refuses the full size


solid = part.part
